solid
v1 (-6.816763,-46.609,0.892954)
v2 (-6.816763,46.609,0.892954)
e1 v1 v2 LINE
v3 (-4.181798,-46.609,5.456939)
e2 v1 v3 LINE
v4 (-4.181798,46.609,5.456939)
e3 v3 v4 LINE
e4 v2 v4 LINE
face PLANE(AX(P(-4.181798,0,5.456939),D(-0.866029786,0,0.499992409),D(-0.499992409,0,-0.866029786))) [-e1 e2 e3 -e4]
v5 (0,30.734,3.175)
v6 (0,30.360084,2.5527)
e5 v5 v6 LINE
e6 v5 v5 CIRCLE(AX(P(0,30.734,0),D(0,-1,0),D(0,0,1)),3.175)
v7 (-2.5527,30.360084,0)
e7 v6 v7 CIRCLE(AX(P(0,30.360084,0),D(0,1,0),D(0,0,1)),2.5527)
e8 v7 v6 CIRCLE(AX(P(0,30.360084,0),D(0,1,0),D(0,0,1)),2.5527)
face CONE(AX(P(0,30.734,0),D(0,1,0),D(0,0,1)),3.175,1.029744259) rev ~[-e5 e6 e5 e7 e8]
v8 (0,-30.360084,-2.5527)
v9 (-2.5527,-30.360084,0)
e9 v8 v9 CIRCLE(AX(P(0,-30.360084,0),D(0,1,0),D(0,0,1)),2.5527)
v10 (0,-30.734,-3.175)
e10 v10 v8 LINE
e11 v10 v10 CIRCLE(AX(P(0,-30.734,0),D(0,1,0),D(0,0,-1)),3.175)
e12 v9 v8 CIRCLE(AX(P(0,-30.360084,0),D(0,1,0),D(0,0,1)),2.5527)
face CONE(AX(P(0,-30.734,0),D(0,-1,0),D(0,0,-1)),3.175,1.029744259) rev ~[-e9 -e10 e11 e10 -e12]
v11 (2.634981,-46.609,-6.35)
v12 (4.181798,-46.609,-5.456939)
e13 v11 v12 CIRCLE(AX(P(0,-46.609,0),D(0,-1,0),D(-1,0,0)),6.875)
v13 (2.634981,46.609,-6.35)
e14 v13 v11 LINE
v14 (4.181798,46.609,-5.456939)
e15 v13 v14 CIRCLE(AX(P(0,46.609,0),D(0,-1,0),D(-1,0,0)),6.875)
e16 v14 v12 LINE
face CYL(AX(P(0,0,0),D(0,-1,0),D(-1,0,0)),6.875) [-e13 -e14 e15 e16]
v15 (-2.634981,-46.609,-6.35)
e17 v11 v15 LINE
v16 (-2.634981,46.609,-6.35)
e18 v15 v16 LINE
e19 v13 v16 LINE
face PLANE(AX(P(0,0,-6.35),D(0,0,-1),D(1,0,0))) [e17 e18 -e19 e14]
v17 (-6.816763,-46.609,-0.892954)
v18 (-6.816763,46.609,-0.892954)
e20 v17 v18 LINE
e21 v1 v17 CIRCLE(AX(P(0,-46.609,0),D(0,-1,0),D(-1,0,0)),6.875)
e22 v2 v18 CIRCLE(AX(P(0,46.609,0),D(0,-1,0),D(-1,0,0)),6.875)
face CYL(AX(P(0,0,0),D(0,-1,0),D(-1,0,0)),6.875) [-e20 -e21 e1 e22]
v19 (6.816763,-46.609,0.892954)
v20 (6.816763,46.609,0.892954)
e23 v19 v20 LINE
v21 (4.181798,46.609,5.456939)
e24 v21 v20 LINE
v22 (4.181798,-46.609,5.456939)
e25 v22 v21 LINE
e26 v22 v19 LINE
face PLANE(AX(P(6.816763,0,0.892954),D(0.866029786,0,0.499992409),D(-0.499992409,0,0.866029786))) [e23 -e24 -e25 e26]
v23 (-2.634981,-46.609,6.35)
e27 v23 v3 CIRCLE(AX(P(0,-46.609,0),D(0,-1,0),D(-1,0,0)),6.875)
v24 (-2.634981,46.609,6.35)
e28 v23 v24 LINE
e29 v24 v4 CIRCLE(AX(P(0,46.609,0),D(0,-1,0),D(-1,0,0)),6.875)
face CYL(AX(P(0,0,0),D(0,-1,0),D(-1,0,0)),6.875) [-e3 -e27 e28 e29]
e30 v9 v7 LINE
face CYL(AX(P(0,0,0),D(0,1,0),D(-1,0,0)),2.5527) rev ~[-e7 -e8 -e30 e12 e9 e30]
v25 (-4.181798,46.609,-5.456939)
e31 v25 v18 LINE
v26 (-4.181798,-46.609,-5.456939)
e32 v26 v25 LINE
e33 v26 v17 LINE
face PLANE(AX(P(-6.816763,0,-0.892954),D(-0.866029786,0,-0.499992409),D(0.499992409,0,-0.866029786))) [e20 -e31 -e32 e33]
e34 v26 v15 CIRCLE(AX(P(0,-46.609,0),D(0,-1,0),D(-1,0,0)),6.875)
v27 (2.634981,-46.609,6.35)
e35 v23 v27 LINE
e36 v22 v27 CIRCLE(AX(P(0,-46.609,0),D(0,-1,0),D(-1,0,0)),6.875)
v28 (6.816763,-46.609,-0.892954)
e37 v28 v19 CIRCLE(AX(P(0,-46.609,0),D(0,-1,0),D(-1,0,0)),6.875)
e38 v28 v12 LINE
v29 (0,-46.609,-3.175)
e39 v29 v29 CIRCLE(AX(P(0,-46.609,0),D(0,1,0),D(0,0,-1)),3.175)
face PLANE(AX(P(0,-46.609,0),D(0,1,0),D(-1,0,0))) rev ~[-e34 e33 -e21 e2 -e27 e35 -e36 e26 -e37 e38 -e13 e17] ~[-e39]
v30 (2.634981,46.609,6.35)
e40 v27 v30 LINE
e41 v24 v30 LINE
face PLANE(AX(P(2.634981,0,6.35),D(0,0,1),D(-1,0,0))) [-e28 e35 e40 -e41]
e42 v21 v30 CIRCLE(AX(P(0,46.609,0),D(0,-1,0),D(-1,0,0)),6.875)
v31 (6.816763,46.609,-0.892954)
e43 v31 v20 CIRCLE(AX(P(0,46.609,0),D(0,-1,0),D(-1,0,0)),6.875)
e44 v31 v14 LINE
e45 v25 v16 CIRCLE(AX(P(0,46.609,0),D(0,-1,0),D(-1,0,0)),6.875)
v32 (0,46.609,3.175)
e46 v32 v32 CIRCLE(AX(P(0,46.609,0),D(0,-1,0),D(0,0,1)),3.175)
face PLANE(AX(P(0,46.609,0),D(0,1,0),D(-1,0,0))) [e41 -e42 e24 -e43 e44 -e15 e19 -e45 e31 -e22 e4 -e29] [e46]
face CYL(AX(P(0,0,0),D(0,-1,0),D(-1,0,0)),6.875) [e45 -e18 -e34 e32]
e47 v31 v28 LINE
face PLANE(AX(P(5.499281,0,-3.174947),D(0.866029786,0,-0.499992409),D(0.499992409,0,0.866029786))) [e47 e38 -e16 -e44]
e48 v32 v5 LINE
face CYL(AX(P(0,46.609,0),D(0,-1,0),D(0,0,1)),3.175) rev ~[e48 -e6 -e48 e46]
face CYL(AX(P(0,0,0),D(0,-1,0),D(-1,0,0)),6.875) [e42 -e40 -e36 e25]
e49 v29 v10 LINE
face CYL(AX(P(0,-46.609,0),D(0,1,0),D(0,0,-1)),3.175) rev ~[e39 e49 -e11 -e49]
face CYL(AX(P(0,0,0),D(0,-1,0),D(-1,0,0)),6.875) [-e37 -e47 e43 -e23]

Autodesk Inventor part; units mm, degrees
ref_plane "YZ Plane" through (0, 0, 0) normal (1, 0, 0) x (0, 1, 0)
ref_plane "XZ Plane" through (0, 0, 0) normal (0, 1, 0) x (-1, 0, 0)
ref_plane "XY Plane" through (0, 0, 0) normal (0, 0, 1) x (1, 0, 0)
sketch "Sketch1" plane through (0, 0, 0) normal (0, 1, 0) x (-1, 0, 0)
  line L0 (-7.3323, 0) -> (-3.6662, 6.35)
  line L1 (-3.6662, 6.35) -> (3.6662, 6.35)
  line L2 (3.6662, 6.35) -> (7.3323, 0)
  line L3 (7.3323, 0) -> (3.6662, -6.35)
  line L4 (3.6662, -6.35) -> (-3.6662, -6.35)
  line L5 (-3.6662, -6.35) -> (-7.3323, 0)
  circle A0 centre (0, 0) radius 6.875
  circle A1 centre (0, 0) radius 6.35
  line L6 (-2.7496, -4.7625) -> (2.7496, -4.7625)
  line L7 (2.7496, -4.7625) -> (5.4993, 0)
  line L8 (5.4993, 0) -> (2.7496, 4.7625)
  line L9 (2.7496, 4.7625) -> (-2.7496, 4.7625)
  line L10 (-2.7496, 4.7625) -> (-5.4993, 0)
  line L11 (-5.4993, 0) -> (-2.7496, -4.7625)
  circle A2 centre (0, 0) radius 4.7625
  circle A3 centre (0, 0) radius 5.125
  circle A4 centre (0, 0) radius 9.525
  circle A5 centre (0, 0) radius 5.9436
  circle A6 centre (0, 0) radius 2.5527
  circle A7 centre (0, 0) radius 2.0193
  circle A8 centre (0, 0) radius 3.175
  circle A9 centre (0, 0) radius 8.7313
  point P0 (-4.1818, 5.457)
  point P1 (-2.635, 6.35)
  point P2 (-6.8168, -0.893)
  point P3 (-6.8168, 0.893)
  point P4 (-2.635, -6.35)
  point P5 (-4.1818, -5.457)
  point P6 (4.1818, -5.457)
  point P7 (2.635, -6.35)
  point P8 (6.8168, -0.893)
  point P9 (6.8168, 0.893)
  point P10 (2.635, 6.35)
  point P11 (4.1818, 5.457)
  point P12 (3.1778, -4.0208)
  point P13 (1.8932, -4.7625)
  point P14 (5.071, -0.7417)
  point P15 (5.071, 0.7417)
  point P16 (1.8932, 4.7625)
  point P17 (3.1778, 4.0208)
  point P18 (-3.1778, 4.0208)
  point P19 (-1.8932, 4.7625)
  point P20 (-5.071, -0.7417)
  point P21 (-5.071, 0.7417)
  point P22 (-1.8932, -4.7625)
  point P23 (-3.1778, -4.0208)
  dimension "d0" = 12.7
  dimension "d1" = 13.75
  dimension "d2" = 12.7
  dimension "d3" = 9.525
  dimension "d4" = 10.25
  dimension "d5" = 19.05
  dimension "d6" = 11.8872
  dimension "d7" = 5.1054
  dimension "d8" = 4.0386
  dimension "d9" = 6.35
  dimension "d153" = 0.7937
extrude "BaseProfile625Round" add sketch "Sketch1" along normal mid plane 93.218 contours L0 A0 L5 | A0 L0 | L0 A1 L5 A0 | L5 A0 | L0 A0 L1 A1 | A1 | L0 L1 A0 | A1 L4 A0 L5 | A0 L4 L5 | L1 A0 | L1 A0 L2 A1 | A1 L3 A0 L4 | L4 A0 | L1 L2 A0 | L2 A0 | L2 A0 L3 A1 | A0 L3 L4 | L3 A0 | L2 L3 A0 | L11 A3 L6 | A3 L11 A2 L6 | L6 A3 | A3 L11 | A2 L7 A3 L6 | A2 | A3 L7 L6 | L11 A3 L10 A2 | L11 L10 A3 | L7 A3 | A2 L8 A3 L7 | L10 A3 | L10 A3 L9 A2 | A3 L8 L7 | L10 L9 A3 | L9 A3 | L9 A3 L8 A2 | L8 A3 | L9 L8 A3 | A4 | A5 | A6 | A7 | A8 | A9
extrude "BaseProfileRoundTube" [suppressed]
extrude "BaseProfile500Hex" [suppressed]
extrude "BaseProfile500Thunderhex" cut sketch "Sketch1" along normal mid plane 914.4 contours L0 A0 L5 | A0 L0 | L5 A0 | L0 L1 A0 | A0 L4 L5 | L1 A0 | L4 A0 | L1 L2 A0 | L2 A0 | A0 L3 L4 | L3 A0 | L2 L3 A0 | A4 | A9
extrude "BaseProfile500Round" [suppressed]
extrude "BaseProfile375Hex" [suppressed]
extrude "BaseProfile375Thunderhex" [suppressed]
extrude "BaseProfile375Round" [suppressed]
extrude "TopShaftProfile1Hex500" [suppressed]
extrude "TopShaftProfile1ThunderHex500" [suppressed]
extrude "TopShaftProfile1Round500" [suppressed]
extrude "TopShaftProfile1Hex375" [suppressed]
extrude "TopShaftProfile1ThunderHex375" [suppressed]
extrude "TopShaftProfile1Round375" [suppressed]
extrude "TopShaftProfile2ThunderHex500" [suppressed]
extrude "TopShaftProfile2Round500" [suppressed]
extrude "TopShaftProfile2Hex375" [suppressed]
extrude "TopShaftProfile2ThunderHex375" [suppressed]
extrude "TopShaftProfile2Round375" [suppressed]
sketch "Sketch2" plane through (0, 0, 0) normal (1, 0, 0) x (0, 1, 0)
  line L0 (-40.8112, 0) -> (47.9537, 0) projected
  line L1 (0, -2.6658) -> (0, 15.9951) projected
  line L2 (53.7515, 4.4704) -> (54.8945, 4.4704)
  line L3 (54.8945, 4.4704) -> (54.8945, 4.7625)
  line L4 (54.8945, 4.7625) -> (55.974, 4.7625)
  line L5 (55.974, 4.7625) -> (56.482, 4.2545)
  line L6 (56.482, 4.2545) -> (56.482, 0)
  line L7 (53.7515, 4.4704) -> (53.7515, 0) construction
  line L8 (53.7515, 4.4704) -> (53.7515, 4.7625)
  line L9 (53.7515, 4.7625) -> (46.609, 4.7625)
  line L10 (46.609, 4.7625) -> (46.609, 0)
  line L11 (46.609, 0) -> (56.482, 0)
  line L12 (-46.609, 5.9436) -> (-47.752, 5.9436)
  line L13 (-47.752, 5.9436) -> (-47.752, 6.35)
  line L14 (-47.752, 6.35) -> (-48.8315, 6.35)
  line L15 (-48.8315, 6.35) -> (-49.3395, 5.842)
  line L16 (-49.3395, 5.842) -> (-49.3395, 0)
  line L17 (-46.609, 5.9436) -> (-46.609, 0) construction
  line L18 (-46.609, 5.9436) -> (-46.609, 6.35)
  line L19 (-46.609, 6.35) -> (-46.609, 6.35)
  line L20 (-46.609, 6.35) -> (-46.609, 0)
  line L21 (-46.609, 0) -> (-49.3395, 0)
  line L22 (0, 0) -> (0, 13.3292)
  line L23 (46.609, 0) -> (46.609, 4.7625)
  point P0 (25.4, 5.9436)
  point P1 (-49.3395, 0)
  point P2 (-46.609, 0)
  point P3 (30.955, 4.7625)
  point P4 (-17.4625, 6.2865)
  point P5 (25.4, 4.7625)
  point P6 (19.4005, 4.7625)
  point P7 (-25.4, 4.7625)
  point P8 (-26.543, 4.7625)
  dimension "TopBearingRoundDia2" = 9.525
  dimension "d65" = 45
  dimension "RetainingRingChamferSize2" = 0.508
  dimension "d72" = 46.609
  dimension "TopSnapRingDia2" = 8.9408
  dimension "d119" = 0.508
  dimension "d120" = 45
  dimension "d135" = 46.609
  dimension "d138" = 56.482
  dimension "d139" = 54.8945
  dimension "d140" = 53.7515
  dimension "d141" = 11.8872
  dimension "d142" = 12.7
  dimension "d143" = 47.752
  dimension "d144" = 46.609
  dimension "d145" = 49.3395
revolve "TopRetentionGroove&BearingRound" [suppressed]
sketch "Sketch3" plane through (0, 46.609, 0) normal (0, 1, 0) x (1, 0, 0)
  point P0 (0, 0)
  point P1 (0, 0)
hole "TopShaftTappedHole" at (0, 46.609, 0) direction (0, -1, 0) diameter 6.35 depth 15.875 tip angle 118
thread "TopShaftThread" size "1/4-20 UNC" class "2B" standard "ANSI Unified Screw Threads" length 12.7
extrude "BottomShaftProfile1Hex500" [suppressed]
extrude "BottomShaftProfile1ThunderHex500" [suppressed]
extrude "BottomShaftProfile1Round500" [suppressed]
extrude "BottomShaftProfile1Hex375" [suppressed]
extrude "BottomShaftProfile1ThunderHex375" [suppressed]
extrude "BottomShaftProfile2ThunderHex500" [suppressed]
extrude "BottomShaftProfile1Round375" [suppressed]
extrude "BottomShaftProfile2Round500" [suppressed]
extrude "BottomShaftProfile2Hex375" [suppressed]
extrude "BottomShaftProfile2ThunderHex375" [suppressed]
extrude "BottomShaftProfile2Round375" [suppressed]
sketch "Sketch4" plane through (0, -46.609, 0) normal (0, -1, 0) x (1, 0, 0)
  point P0 (0, 0)
  point P1 (0, 0)
hole "BottomShaftTappedHole" at (0, -46.609, 0) direction (0, 1, 0) diameter 6.35 depth 15.875 tip angle 118
thread "BottomShaftThread" size "1/4-20 UNC" class "2B" standard "ANSI Unified Screw Threads" length 12.7
revolve "BottomRetentionGroove&BearingRound" [suppressed]
extrude "BaseProfile375ThunderhexHole" [suppressed]
extrude "BaseProfile500ThunderhexHole" cut sketch "Sketch1" along normal mid plane 914.4 contours A6 | A7
equation "\"d18\" = BottomShaftProfile1Depth + TopShaftProfile1Depth + BaseShaftLength + TopShaftProfile2Depth + BottomShaftProfile2Depth"
equation "\"d72\" = 0.5 * d18"
equation "\"BaseShaftLength\" = 93.218"
equation "\"TopShaftProfile1Depth\" = 0"
equation "\"TopShaftProfile2Depth\" = 0"
equation "\"BottomShaftProfile1Depth\" = 0"
equation "\"BottomShaftProfile2Depth\" = 0"
equation "\"TopShaftHoleDia\" = 6.35"
equation "\"BottomShaftHoleDia\" = 6.35"
equation "\"TopBearingRoundDia\" = 9.525"
equation "\"TopGrooveWidth\" = 1.143"
equation "\"TopBearingRoundDistance\" = 7.14248"
equation "\"TopSnapRingDia\" = 8.9408"
equation "\"BottomBearingRoundDia\" = 12.7"
equation "\"BottomGrooveWidth\" = 1.143"
equation "\"BottomBearingRoundDistance\" = 0"
equation "\"BottomSnapRingDia\" = 11.8872"
equation "\"RoundTubeDia\" = 19.05"
properties part number "GreyT Claw 2 Pivot Shaft" material "Aluminum 6061"
